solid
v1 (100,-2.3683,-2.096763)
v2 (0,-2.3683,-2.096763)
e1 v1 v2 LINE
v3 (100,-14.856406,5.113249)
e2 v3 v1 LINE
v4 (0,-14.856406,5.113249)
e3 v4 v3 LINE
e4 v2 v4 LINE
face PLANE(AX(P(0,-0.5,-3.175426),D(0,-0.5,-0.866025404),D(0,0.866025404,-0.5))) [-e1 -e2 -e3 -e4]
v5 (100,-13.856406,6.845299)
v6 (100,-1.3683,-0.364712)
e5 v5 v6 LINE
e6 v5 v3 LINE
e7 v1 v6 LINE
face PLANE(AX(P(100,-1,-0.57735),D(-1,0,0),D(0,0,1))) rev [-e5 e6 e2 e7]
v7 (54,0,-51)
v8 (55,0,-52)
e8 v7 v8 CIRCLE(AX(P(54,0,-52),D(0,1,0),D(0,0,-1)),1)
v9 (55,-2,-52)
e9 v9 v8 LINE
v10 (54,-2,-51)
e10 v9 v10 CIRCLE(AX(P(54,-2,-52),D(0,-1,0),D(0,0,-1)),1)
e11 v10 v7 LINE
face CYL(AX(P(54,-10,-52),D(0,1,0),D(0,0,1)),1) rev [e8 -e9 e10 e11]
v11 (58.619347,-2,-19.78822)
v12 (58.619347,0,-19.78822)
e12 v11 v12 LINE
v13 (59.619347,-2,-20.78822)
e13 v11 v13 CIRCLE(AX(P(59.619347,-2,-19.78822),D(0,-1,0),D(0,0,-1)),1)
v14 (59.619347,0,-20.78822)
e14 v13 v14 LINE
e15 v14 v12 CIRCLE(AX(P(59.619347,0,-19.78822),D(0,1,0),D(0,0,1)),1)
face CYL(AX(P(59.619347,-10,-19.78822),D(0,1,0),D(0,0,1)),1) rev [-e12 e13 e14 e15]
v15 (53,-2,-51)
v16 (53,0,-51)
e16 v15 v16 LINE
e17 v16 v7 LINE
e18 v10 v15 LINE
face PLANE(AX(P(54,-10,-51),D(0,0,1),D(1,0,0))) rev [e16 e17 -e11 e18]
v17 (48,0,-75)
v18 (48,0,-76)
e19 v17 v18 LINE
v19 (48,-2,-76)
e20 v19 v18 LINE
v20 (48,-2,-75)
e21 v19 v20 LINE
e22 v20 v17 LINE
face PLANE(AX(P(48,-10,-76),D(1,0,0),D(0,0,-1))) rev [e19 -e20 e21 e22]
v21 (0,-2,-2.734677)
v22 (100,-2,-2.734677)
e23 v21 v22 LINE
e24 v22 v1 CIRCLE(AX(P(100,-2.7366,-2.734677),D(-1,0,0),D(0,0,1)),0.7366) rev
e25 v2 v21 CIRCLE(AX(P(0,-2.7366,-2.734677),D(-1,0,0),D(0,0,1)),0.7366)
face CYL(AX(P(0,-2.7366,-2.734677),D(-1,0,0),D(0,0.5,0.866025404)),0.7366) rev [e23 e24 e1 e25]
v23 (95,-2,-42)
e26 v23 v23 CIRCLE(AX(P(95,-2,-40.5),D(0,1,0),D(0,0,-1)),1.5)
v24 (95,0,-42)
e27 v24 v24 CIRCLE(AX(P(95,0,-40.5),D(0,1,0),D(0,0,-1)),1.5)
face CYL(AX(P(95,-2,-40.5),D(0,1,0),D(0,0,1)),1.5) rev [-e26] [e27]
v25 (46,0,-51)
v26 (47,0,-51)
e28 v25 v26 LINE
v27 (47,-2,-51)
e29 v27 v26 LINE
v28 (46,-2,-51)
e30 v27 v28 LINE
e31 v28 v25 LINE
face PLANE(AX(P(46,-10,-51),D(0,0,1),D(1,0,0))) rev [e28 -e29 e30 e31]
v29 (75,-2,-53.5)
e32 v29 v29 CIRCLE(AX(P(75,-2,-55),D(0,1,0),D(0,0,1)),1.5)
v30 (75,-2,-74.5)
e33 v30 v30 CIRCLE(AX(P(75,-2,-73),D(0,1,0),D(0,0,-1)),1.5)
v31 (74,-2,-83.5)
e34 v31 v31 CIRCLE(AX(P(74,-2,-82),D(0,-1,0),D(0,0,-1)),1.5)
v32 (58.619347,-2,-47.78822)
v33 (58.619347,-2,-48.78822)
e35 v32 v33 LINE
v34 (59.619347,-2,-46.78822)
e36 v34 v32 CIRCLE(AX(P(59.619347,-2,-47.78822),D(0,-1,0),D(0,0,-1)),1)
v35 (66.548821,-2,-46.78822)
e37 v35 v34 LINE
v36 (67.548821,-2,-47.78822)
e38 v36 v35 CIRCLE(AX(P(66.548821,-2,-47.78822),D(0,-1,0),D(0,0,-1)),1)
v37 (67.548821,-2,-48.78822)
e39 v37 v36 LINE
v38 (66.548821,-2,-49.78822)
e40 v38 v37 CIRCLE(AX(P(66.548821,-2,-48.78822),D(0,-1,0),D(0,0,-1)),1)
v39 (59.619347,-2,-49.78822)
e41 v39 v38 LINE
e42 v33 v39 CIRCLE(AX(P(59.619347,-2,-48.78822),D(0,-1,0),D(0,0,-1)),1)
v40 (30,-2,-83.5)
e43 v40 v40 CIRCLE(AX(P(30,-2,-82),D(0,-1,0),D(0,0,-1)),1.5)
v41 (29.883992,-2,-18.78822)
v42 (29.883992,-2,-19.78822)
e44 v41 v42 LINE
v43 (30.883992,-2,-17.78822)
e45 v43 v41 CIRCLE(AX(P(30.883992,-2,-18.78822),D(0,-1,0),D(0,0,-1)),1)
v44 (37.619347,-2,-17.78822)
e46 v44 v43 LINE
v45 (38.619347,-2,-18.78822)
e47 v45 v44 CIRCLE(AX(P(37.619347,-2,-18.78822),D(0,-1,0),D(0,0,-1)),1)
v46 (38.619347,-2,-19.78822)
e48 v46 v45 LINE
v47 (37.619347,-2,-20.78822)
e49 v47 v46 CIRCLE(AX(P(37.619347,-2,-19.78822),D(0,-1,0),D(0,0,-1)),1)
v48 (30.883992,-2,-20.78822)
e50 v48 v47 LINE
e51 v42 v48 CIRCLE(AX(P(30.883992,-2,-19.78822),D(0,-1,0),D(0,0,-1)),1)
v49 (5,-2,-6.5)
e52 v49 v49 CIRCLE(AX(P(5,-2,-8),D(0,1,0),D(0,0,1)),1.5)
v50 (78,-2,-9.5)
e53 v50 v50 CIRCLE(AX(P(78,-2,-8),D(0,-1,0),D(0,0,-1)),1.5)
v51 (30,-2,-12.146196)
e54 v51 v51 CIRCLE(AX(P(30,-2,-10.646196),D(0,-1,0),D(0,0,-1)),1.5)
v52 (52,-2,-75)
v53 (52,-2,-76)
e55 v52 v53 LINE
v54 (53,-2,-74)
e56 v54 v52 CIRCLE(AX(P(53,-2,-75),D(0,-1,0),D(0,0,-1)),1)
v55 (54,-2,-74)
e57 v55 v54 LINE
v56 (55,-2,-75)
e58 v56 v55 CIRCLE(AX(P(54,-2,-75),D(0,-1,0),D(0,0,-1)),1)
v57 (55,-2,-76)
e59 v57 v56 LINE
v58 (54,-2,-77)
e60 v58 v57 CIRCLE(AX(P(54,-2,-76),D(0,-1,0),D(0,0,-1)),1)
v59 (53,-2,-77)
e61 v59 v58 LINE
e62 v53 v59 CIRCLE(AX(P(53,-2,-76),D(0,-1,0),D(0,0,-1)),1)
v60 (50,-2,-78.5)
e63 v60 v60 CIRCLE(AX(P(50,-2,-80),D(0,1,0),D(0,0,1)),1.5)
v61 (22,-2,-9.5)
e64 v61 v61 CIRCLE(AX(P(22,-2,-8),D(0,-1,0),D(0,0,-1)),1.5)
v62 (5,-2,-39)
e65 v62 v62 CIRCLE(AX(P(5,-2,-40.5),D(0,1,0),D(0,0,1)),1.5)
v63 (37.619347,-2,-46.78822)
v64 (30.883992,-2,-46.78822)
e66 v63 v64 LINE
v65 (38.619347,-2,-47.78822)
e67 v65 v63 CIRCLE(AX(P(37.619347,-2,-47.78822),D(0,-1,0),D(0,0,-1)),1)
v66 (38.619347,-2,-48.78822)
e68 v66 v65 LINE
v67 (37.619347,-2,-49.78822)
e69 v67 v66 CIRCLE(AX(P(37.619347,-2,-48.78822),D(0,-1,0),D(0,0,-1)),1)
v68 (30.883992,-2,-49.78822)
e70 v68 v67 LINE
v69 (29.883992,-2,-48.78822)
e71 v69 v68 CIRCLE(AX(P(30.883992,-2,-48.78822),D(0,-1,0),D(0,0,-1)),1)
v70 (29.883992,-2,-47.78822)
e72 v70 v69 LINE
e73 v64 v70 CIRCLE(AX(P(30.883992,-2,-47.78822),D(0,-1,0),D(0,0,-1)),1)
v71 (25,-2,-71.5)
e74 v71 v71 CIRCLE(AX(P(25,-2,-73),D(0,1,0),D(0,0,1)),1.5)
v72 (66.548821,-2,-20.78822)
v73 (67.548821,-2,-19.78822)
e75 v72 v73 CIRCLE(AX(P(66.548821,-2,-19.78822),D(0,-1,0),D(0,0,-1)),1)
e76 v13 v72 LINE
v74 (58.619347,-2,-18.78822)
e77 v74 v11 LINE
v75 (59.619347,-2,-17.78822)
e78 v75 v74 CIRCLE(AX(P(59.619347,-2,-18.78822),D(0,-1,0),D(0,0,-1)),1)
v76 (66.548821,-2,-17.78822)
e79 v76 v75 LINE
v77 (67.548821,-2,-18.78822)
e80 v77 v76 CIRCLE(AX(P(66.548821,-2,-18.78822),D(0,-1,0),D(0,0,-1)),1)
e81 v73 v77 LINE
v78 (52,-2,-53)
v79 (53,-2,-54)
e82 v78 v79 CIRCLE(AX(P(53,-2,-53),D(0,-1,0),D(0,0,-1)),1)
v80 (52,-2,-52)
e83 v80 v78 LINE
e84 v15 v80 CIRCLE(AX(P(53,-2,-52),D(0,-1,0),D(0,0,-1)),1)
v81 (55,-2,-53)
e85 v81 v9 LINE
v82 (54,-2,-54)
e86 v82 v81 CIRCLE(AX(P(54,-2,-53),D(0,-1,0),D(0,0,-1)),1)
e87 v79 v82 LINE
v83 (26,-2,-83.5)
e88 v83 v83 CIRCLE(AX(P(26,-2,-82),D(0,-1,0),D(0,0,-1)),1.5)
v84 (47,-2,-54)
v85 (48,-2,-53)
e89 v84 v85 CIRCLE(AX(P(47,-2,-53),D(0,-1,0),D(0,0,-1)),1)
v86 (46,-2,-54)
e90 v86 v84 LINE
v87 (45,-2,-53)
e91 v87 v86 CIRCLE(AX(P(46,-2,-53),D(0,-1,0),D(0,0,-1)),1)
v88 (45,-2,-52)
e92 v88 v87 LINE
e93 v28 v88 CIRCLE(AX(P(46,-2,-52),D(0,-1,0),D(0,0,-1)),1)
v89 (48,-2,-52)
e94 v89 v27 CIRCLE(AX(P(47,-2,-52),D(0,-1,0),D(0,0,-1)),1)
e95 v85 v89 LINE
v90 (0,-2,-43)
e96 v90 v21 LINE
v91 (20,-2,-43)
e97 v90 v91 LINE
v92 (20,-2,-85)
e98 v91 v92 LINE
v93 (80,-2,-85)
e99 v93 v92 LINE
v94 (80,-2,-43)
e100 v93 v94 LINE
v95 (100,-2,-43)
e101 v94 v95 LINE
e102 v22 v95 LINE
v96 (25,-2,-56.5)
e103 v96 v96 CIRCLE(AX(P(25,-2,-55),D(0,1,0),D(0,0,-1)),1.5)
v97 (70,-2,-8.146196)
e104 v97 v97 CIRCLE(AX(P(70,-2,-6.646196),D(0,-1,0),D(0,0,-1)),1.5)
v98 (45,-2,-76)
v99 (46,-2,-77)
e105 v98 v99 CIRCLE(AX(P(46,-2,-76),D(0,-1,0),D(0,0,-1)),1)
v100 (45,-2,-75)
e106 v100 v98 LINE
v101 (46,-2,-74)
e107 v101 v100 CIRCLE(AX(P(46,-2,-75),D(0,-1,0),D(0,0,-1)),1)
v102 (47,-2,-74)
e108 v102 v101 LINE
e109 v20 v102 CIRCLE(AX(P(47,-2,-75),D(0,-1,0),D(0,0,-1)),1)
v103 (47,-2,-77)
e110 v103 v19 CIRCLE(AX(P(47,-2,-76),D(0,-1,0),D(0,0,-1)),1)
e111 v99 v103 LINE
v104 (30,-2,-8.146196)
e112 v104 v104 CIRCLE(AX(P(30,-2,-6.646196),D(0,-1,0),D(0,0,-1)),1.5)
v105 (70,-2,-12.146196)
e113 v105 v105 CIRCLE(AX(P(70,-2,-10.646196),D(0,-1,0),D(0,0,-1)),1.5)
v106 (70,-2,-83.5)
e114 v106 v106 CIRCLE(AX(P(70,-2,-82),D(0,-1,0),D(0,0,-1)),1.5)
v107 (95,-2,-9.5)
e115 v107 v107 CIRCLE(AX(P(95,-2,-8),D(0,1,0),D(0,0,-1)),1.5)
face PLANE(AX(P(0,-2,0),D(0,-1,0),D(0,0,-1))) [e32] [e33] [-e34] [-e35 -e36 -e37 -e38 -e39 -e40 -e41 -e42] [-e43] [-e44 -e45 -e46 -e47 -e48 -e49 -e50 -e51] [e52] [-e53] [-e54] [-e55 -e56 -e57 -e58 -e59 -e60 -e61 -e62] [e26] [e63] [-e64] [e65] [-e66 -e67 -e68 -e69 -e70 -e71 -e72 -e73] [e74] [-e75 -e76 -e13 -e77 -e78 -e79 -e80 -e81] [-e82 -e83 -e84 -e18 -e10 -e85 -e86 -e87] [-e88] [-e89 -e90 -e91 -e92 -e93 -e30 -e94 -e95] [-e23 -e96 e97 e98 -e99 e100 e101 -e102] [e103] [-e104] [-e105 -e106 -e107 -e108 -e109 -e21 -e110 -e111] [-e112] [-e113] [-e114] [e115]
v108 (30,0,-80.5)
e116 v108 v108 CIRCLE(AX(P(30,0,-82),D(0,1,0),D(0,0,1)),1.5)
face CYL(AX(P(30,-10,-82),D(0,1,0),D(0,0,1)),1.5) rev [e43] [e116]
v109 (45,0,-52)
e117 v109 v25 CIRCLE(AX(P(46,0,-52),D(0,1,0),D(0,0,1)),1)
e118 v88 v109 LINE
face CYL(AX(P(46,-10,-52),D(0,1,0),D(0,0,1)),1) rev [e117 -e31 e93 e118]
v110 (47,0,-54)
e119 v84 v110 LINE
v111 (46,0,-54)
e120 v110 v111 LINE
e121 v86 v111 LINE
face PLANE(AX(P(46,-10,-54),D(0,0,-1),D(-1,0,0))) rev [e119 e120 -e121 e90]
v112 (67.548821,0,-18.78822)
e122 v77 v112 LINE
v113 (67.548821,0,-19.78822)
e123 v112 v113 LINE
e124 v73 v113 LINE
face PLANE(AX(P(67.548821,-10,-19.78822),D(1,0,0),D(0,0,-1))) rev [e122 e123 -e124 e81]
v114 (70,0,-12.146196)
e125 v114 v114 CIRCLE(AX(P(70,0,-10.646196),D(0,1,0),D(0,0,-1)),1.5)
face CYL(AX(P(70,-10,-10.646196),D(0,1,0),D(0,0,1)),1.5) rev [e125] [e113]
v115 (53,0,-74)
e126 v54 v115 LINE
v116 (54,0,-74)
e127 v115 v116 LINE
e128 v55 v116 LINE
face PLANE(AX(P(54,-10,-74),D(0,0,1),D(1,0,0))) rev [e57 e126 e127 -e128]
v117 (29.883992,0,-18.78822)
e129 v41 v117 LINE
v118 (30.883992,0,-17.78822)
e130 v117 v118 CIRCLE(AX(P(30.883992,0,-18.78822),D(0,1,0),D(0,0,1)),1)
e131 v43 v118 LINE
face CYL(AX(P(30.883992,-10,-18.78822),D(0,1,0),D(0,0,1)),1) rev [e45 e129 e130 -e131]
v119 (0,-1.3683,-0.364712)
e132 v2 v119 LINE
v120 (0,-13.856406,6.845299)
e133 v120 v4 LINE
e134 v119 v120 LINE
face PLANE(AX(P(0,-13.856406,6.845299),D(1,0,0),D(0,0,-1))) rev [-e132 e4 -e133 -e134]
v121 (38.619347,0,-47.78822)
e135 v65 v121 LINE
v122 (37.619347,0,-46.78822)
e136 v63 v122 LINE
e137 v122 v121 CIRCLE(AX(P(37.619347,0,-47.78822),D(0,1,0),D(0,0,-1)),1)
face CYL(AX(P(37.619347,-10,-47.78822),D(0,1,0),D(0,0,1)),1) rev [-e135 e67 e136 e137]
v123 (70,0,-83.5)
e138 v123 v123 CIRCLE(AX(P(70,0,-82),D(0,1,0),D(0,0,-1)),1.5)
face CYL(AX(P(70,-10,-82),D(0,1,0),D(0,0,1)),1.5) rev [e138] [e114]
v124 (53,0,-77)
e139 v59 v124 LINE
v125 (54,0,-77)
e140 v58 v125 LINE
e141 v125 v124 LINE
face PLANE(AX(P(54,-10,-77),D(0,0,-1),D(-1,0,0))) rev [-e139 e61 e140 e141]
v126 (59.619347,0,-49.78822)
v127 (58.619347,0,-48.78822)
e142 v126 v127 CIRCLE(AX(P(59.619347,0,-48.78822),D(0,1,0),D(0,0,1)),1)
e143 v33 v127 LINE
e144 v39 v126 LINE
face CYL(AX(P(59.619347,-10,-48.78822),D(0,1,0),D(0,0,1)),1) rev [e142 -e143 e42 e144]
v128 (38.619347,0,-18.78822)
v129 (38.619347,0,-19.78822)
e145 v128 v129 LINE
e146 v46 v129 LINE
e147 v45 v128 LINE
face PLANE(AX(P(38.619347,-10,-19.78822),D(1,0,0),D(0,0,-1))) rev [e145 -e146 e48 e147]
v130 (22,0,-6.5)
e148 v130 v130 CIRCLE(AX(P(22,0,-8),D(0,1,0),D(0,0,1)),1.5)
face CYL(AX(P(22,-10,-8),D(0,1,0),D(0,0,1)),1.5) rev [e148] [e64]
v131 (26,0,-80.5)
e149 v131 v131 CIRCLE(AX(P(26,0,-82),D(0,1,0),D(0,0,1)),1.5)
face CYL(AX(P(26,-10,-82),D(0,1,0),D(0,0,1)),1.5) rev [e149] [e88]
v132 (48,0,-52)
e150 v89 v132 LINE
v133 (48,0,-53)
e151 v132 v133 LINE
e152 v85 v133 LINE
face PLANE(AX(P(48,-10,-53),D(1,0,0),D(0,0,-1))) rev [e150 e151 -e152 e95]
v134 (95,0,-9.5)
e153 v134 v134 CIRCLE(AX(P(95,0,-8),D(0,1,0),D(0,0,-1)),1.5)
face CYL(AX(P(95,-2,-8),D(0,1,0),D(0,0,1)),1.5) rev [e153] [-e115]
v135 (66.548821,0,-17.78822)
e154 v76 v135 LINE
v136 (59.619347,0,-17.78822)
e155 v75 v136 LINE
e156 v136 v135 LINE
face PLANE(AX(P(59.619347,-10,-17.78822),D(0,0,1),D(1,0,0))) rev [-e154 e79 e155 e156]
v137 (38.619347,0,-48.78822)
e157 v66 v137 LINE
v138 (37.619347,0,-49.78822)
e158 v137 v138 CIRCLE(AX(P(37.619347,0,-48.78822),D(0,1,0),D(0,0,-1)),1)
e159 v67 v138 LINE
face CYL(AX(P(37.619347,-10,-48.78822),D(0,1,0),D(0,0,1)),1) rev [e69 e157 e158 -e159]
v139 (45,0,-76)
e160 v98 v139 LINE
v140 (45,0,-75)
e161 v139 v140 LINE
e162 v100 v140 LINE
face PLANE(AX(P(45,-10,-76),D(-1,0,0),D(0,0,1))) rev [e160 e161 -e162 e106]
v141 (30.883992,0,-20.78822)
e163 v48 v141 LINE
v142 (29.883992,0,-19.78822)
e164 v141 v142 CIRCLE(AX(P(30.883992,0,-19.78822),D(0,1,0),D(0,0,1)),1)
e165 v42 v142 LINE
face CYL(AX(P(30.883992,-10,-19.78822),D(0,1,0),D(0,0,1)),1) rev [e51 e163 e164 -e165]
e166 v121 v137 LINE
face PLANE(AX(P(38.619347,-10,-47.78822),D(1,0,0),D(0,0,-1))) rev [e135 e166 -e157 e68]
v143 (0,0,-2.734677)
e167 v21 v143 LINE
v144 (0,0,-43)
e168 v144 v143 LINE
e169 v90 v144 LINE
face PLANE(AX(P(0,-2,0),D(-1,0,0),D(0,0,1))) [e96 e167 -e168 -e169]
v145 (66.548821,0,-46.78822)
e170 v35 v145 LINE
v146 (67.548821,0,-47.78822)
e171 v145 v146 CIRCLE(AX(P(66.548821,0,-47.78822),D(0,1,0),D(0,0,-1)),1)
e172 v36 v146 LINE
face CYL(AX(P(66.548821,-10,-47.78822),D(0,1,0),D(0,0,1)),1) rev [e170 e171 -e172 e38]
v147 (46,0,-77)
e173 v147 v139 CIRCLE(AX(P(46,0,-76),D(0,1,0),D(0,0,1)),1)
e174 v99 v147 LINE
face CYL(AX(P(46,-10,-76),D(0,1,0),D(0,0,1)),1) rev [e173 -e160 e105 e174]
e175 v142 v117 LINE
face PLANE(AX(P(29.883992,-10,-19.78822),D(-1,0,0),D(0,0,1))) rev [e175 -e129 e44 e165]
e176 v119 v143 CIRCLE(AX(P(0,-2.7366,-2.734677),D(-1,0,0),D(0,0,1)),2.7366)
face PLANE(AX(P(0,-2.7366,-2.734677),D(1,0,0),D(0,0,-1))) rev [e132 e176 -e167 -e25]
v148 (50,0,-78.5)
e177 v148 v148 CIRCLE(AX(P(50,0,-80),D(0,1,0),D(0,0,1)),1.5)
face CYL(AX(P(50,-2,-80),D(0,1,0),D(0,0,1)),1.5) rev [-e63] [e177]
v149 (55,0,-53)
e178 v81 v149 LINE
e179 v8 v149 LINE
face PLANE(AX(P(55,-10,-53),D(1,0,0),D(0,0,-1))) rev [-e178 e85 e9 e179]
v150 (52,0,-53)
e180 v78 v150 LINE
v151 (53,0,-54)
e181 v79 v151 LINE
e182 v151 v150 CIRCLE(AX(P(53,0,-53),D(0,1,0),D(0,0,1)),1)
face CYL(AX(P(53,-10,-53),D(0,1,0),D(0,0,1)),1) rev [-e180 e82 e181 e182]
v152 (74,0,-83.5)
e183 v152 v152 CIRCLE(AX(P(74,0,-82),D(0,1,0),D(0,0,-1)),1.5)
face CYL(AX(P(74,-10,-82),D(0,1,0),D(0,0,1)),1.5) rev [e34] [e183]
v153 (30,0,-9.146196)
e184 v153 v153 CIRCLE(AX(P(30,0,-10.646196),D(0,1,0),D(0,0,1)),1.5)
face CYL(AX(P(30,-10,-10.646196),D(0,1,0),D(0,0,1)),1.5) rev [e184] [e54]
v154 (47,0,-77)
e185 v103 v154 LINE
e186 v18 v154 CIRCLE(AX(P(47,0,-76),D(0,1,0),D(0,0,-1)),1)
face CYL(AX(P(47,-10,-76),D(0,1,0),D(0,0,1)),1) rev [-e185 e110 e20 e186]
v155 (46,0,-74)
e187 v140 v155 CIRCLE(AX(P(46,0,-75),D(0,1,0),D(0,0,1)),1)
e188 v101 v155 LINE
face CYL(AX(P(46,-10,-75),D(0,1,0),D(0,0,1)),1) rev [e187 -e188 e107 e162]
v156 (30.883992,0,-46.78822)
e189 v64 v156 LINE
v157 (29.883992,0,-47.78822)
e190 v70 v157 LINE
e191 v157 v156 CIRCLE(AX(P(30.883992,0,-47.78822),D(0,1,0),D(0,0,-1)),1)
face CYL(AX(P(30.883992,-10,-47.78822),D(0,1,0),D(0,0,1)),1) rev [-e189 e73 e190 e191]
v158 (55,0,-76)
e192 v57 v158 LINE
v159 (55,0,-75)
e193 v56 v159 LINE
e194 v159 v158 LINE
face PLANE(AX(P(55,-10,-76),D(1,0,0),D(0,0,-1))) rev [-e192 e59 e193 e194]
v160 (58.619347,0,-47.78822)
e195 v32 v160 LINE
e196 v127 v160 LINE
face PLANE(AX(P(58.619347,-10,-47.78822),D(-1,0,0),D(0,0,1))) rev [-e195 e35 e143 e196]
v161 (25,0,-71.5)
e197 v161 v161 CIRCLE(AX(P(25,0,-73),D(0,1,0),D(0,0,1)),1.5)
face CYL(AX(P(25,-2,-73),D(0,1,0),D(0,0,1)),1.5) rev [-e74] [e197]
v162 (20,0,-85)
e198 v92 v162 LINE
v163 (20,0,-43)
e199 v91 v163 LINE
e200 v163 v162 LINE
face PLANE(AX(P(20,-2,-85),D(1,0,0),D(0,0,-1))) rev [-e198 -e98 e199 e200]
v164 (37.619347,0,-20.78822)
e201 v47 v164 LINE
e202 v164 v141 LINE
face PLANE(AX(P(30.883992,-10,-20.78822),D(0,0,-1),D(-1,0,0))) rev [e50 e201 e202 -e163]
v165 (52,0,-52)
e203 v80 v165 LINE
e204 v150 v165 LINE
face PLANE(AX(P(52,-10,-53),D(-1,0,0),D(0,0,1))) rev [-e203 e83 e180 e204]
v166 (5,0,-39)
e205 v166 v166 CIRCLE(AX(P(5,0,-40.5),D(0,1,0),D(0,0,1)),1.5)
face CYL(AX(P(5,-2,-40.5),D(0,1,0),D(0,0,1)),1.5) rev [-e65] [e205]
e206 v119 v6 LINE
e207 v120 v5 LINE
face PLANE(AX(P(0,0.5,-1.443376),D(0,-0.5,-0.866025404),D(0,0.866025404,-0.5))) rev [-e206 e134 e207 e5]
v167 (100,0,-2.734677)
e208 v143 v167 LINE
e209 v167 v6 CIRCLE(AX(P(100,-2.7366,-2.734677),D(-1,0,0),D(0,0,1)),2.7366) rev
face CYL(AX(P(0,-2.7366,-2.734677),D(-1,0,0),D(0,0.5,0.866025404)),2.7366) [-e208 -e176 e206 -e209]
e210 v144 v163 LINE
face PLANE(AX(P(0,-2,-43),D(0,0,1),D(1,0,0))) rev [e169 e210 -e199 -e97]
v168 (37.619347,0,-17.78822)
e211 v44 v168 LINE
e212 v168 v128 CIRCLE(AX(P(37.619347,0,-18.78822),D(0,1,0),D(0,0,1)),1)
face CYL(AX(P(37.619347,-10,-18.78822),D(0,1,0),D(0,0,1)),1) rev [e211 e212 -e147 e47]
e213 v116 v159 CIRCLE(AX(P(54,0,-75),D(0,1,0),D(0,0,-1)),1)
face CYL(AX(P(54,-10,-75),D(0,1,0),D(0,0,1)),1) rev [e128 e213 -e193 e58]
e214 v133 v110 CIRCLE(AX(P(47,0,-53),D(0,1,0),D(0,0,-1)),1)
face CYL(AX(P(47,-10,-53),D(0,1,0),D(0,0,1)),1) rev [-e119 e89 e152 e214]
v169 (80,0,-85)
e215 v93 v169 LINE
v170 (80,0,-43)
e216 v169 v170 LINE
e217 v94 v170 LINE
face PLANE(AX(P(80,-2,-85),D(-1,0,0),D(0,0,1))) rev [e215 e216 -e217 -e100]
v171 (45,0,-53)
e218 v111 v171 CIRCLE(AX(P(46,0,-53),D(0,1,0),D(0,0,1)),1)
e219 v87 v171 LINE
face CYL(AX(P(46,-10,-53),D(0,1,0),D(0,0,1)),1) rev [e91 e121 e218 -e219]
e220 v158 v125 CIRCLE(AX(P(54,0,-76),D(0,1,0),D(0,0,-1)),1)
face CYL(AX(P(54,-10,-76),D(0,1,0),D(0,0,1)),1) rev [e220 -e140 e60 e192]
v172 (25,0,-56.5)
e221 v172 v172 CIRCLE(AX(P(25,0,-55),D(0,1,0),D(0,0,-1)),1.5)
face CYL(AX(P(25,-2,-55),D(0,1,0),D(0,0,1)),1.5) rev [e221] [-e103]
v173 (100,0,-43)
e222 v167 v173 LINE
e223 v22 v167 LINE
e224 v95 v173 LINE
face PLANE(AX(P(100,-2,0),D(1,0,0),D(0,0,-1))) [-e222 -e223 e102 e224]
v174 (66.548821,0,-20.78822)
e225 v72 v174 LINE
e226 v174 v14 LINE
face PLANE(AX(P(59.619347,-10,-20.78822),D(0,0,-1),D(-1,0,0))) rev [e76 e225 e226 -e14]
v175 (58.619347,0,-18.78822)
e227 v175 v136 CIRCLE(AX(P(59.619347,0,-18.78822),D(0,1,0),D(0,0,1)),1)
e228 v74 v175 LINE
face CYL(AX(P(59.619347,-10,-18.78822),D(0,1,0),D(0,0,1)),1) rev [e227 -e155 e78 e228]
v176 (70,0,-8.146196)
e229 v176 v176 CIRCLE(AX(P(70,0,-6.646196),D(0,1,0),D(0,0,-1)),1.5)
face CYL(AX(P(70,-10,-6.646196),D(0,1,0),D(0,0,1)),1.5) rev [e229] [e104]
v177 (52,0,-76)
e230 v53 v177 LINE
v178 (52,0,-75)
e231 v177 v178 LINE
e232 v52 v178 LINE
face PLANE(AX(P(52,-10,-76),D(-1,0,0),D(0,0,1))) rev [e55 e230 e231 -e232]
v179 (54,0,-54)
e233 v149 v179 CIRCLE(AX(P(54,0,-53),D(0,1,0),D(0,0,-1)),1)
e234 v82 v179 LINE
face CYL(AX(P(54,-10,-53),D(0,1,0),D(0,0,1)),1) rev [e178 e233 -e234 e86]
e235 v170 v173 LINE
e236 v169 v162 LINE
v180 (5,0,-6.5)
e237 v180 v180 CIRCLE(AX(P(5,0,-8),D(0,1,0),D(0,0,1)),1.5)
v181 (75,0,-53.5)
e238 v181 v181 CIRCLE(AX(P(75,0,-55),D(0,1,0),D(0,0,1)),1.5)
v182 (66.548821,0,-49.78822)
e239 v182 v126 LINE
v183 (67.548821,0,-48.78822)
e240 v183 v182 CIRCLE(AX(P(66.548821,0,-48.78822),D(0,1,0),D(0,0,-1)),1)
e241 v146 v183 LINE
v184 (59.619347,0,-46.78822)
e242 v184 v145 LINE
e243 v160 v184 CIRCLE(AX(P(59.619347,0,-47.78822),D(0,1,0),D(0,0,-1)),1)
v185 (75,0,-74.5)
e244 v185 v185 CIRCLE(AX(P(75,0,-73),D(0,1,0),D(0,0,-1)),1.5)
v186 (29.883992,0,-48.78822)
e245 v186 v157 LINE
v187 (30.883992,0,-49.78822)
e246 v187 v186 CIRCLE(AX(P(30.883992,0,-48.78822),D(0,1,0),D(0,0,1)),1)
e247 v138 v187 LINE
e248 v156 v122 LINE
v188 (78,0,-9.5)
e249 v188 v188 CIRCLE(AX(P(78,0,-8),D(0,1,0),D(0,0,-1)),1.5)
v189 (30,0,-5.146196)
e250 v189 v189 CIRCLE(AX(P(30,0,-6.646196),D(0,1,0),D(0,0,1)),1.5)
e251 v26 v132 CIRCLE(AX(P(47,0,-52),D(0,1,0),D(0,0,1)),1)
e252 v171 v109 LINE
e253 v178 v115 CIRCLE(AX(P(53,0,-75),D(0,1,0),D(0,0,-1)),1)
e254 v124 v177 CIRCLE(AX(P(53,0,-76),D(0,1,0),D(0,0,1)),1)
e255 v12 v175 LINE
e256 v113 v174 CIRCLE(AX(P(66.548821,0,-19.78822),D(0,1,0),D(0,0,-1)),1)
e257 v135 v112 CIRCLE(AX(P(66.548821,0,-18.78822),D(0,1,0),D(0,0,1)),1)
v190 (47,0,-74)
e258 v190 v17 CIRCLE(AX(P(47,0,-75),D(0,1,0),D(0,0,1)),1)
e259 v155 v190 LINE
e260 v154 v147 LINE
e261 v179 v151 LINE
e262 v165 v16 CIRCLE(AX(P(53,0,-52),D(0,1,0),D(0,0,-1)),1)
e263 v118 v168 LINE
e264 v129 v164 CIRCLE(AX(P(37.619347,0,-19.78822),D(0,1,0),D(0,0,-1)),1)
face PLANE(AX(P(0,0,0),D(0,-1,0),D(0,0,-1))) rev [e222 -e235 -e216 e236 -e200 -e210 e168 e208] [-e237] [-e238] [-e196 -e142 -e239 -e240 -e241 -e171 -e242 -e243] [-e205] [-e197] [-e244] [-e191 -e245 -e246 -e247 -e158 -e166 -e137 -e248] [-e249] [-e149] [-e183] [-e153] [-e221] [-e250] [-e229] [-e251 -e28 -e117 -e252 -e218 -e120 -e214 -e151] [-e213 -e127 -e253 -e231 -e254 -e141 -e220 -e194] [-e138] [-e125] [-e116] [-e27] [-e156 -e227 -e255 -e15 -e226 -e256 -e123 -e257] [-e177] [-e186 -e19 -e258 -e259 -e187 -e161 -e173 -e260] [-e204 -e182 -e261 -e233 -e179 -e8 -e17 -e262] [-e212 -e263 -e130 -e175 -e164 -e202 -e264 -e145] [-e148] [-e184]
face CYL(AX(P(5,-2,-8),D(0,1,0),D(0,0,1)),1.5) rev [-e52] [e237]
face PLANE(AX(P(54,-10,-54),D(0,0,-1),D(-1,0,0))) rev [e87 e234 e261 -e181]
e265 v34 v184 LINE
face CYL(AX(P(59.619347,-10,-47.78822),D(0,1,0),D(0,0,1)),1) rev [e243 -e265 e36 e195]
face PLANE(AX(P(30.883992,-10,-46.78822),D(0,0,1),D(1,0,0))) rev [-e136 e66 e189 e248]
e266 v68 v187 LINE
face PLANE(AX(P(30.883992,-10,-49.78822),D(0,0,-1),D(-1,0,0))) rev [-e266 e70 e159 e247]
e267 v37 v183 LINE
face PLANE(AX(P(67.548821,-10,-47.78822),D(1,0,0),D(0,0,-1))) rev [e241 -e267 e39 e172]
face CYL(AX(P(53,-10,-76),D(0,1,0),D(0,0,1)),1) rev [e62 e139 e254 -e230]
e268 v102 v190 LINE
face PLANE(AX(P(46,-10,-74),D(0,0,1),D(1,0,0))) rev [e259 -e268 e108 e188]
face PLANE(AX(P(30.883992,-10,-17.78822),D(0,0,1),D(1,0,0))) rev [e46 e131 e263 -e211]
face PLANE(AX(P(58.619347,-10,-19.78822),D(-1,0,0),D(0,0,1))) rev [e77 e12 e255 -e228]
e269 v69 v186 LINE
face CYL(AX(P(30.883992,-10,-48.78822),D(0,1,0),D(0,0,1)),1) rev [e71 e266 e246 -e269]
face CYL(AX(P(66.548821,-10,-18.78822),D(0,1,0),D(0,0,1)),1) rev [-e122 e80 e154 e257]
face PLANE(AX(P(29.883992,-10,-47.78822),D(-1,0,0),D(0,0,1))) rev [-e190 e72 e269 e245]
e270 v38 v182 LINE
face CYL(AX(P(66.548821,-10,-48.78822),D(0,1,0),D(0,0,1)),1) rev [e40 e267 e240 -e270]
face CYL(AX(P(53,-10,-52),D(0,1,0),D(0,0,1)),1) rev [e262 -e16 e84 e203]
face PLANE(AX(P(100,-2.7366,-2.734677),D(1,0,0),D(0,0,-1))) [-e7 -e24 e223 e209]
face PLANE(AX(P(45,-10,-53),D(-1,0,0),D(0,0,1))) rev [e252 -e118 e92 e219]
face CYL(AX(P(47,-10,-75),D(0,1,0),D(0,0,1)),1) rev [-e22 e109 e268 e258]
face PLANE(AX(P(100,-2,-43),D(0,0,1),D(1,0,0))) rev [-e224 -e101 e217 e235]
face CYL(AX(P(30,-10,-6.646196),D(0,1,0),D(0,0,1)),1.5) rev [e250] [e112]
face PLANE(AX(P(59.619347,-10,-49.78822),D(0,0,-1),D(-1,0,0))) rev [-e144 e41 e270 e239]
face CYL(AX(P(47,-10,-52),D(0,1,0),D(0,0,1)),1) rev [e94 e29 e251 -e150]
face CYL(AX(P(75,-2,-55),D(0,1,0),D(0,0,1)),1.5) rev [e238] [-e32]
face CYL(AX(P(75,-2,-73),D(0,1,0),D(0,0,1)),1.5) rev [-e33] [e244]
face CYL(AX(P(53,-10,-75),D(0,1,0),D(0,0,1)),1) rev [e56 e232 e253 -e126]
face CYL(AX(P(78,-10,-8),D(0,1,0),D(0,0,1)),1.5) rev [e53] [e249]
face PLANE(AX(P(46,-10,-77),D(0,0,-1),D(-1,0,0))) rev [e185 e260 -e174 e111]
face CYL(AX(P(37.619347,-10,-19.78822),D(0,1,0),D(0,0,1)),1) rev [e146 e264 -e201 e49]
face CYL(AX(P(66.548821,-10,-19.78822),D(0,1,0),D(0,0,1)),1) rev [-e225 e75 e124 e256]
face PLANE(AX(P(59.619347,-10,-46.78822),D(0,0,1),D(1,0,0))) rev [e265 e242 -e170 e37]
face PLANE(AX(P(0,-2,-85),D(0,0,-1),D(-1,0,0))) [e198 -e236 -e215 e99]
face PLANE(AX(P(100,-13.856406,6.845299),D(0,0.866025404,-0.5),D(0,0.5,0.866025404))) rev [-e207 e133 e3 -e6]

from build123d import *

# Parameters (mm, degrees)
SKETCH1_W            = 100
SKETCH1_H            = 85
BASE_FLANGE1_DEPTH   = 2
EDGE_FLANGE2_DEPTH   = 100
EDGE_FLANGE2_2_DEPTH = 100
SKETCH16_R           = 1.5
SKETCH16_W           = 20
SKETCH16_H           = 42
CUT_EXTRUDE2_DEPTH   = 2
SKETCH18_R           = 1.5
CUT_EXTRUDE3_DEPTH   = 10
SKETCH19_R           = 1.5
CUT_EXTRUDE5_DEPTH   = 10
CUT_EXTRUDE6_DEPTH   = 10
SKETCH21_R           = 1.5
CUT_EXTRUDE7_DEPTH   = 10


# Read off the part's stored shape, not the designer's step: Edge-Flange2
# Sheet-metal steps are written as plain solids
with BuildPart() as part:
    # Sketch1 → Base-Flange1 (new body)
    with BuildSketch(Plane(origin=(0, 0, 0), x_dir=(1, 0, 0), z_dir=(0, 1, 0))):
        with Locations((50, 42.5)):
            Rectangle(SKETCH1_W, SKETCH1_H)
    extrude(amount=-BASE_FLANGE1_DEPTH)

    # Edge-Flange2 outline → Edge-Flange2 (cut)
    with BuildSketch(Plane.YZ):
        with BuildLine():
            Line((-2, 0), (-1.3683, -0.364712165))
            ThreePointArc((-1.3683, -0.364712165), (-0.36663488, -1.366377285), (0, -2.734677285))
            Line((0, -2.734677285), (0, 0))
            Line((0, 0), (-2, 0))
        make_face()
    extrude(amount=EDGE_FLANGE2_DEPTH, mode=Mode.SUBTRACT)

    # Edge-Flange2 2 outline → Edge-Flange2 2 (add)
    with BuildSketch(Plane.YZ):
        with BuildLine():
            Line((-2, -2.734677285), (-2, 0))
            Line((-2, 0), (-13.856406461, 6.845299462))
            Line((-13.856406461, 6.845299462), (-14.856406461, 5.113248654))
            Line((-14.856406461, 5.113248654), (-2.3683, -2.096762973))
            ThreePointArc((-2.3683, -2.096762973), (-2.098685688, -2.366377285), (-2, -2.734677285))
        make_face()
    extrude(amount=EDGE_FLANGE2_2_DEPTH)

    # Sketch16 → Cut-Extrude2 (cut)
    with BuildSketch(Plane(origin=(0, 0, 0), x_dir=(1, 0, 0), z_dir=(0, 1, 0))):
        with Locations(Location((5, 8, 0), (0, 0, 270))):
            Circle(SKETCH16_R)
        with Locations(Location((50, 80, 0), (0, 0, 270))):
            Circle(SKETCH16_R)
        with Locations(Location((5, 40.5, 0), (0, 0, 270))):
            Circle(SKETCH16_R)
        with Locations(Location((95, 8, 0), (0, 0, 90))):
            Circle(SKETCH16_R)
        with Locations(Location((95, 40.5, 0), (0, 0, 90))):
            Circle(SKETCH16_R)
        with Locations(Location((25, 73, 0), (0, 0, 270))):
            Circle(SKETCH16_R)
        with Locations(Location((25, 55, 0), (0, 0, 90))):
            Circle(SKETCH16_R)
        with Locations(Location((75, 55, 0), (0, 0, 270))):
            Circle(SKETCH16_R)
        with Locations(Location((75, 73, 0), (0, 0, 90))):
            Circle(SKETCH16_R)
        with Locations((10, 64)):
            Rectangle(SKETCH16_W, SKETCH16_H)
        with Locations((90, 64)):
            Rectangle(SKETCH16_W, SKETCH16_H)
    extrude(amount=-CUT_EXTRUDE2_DEPTH, mode=Mode.SUBTRACT)

    # Sketch18 → Cut-Extrude3 (cut)
    with BuildSketch(Plane(origin=(0, 0, 0), x_dir=(1, 0, 0), z_dir=(0, 1, 0))):
        with Locations(Location((22, 8, 0), (0, 0, 270))):
            Circle(SKETCH18_R)
        with Locations(Location((78, 8, 0), (0, 0, 90))):
            Circle(SKETCH18_R)
    extrude(amount=-CUT_EXTRUDE3_DEPTH, mode=Mode.SUBTRACT)

    # Sketch19 → Cut-Extrude5 (cut)
    with BuildSketch(Plane(origin=(0, 0, 0), x_dir=(1, 0, 0), z_dir=(0, 1, 0))):
        with Locations(Location((30, 6.646195809, 0), (0, 0, 270))):
            Circle(SKETCH19_R)
        with Locations(Location((30, 10.646195809, 0), (0, 0, 270))):
            Circle(SKETCH19_R)
        with Locations(Location((70, 6.646195809, 0), (0, 0, 90))):
            Circle(SKETCH19_R)
        with Locations(Location((70, 10.646195809, 0), (0, 0, 90))):
            Circle(SKETCH19_R)
    extrude(amount=-CUT_EXTRUDE5_DEPTH, mode=Mode.SUBTRACT)

    # Sketch20 → Cut-Extrude6 (cut)
    with BuildSketch(Plane(origin=(0, 0, 0), x_dir=(1, 0, 0), z_dir=(0, 1, 0))):
        with BuildLine():
            Line((59.619346947, 49.788219715), (66.548820549, 49.788219715))
            ThreePointArc((66.548820549, 49.788219715), (67.25592733, 49.495326496), (67.548820549, 48.788219715))
            Line((67.548820549, 48.788219715), (67.548820549, 47.788219715))
            ThreePointArc((67.548820549, 47.788219715), (67.25592733, 47.081112934), (66.548820549, 46.788219715))
            Line((66.548820549, 46.788219715), (59.619346947, 46.788219715))
            ThreePointArc((59.619346947, 46.788219715), (58.912240166, 47.081112934), (58.619346947, 47.788219715))
            Line((58.619346947, 47.788219715), (58.619346947, 48.788219715))
            ThreePointArc((58.619346947, 48.788219715), (58.912240166, 49.495326496), (59.619346947, 49.788219715))
        make_face()
        with BuildLine():
            Line((30.883992336, 20.788219715), (37.619346947, 20.788219715))
            ThreePointArc((37.619346947, 20.788219715), (38.326453728, 20.495326496), (38.619346947, 19.788219715))
            Line((38.619346947, 19.788219715), (38.619346947, 18.788219715))
            ThreePointArc((38.619346947, 18.788219715), (38.326453728, 18.081112934), (37.619346947, 17.788219715))
            Line((37.619346947, 17.788219715), (30.883992336, 17.788219715))
            ThreePointArc((30.883992336, 17.788219715), (30.176885554, 18.081112934), (29.883992336, 18.788219715))
            Line((29.883992336, 18.788219715), (29.883992336, 19.788219715))
            ThreePointArc((29.883992336, 19.788219715), (30.176885554, 20.495326496), (30.883992336, 20.788219715))
        make_face()
        with BuildLine():
            Line((59.619346947, 20.788219715), (66.548820549, 20.788219715))
            ThreePointArc((66.548820549, 20.788219715), (67.25592733, 20.495326496), (67.548820549, 19.788219715))
            Line((67.548820549, 19.788219715), (67.548820549, 18.788219715))
            ThreePointArc((67.548820549, 18.788219715), (67.25592733, 18.081112934), (66.548820549, 17.788219715))
            Line((66.548820549, 17.788219715), (59.619346947, 17.788219715))
            ThreePointArc((59.619346947, 17.788219715), (58.912240166, 18.081112934), (58.619346947, 18.788219715))
            Line((58.619346947, 18.788219715), (58.619346947, 19.788219715))
            ThreePointArc((58.619346947, 19.788219715), (58.912240166, 20.495326496), (59.619346947, 20.788219715))
        make_face()
        with BuildLine():
            Line((30.883992336, 49.788219715), (37.619346947, 49.788219715))
            ThreePointArc((37.619346947, 49.788219715), (38.326453728, 49.495326496), (38.619346947, 48.788219715))
            Line((38.619346947, 48.788219715), (38.619346947, 47.788219715))
            ThreePointArc((38.619346947, 47.788219715), (38.326453728, 47.081112934), (37.619346947, 46.788219715))
            Line((37.619346947, 46.788219715), (30.883992336, 46.788219715))
            ThreePointArc((30.883992336, 46.788219715), (30.176885554, 47.081112934), (29.883992336, 47.788219715))
            Line((29.883992336, 47.788219715), (29.883992336, 48.788219715))
            ThreePointArc((29.883992336, 48.788219715), (30.176885554, 49.495326496), (30.883992336, 49.788219715))
        make_face()
    extrude(amount=-CUT_EXTRUDE6_DEPTH, mode=Mode.SUBTRACT)

    # Sketch21 → Cut-Extrude7 (cut)
    with BuildSketch(Plane(origin=(0, 0, 0), x_dir=(1, 0, 0), z_dir=(0, 1, 0))):
        with Locations(Location((26, 82, 0), (0, 0, 270))):
            Circle(SKETCH21_R)
        with Locations(Location((30, 82, 0), (0, 0, 270))):
            Circle(SKETCH21_R)
        with Locations(Location((74, 82, 0), (0, 0, 90))):
            Circle(SKETCH21_R)
        with Locations(Location((70, 82, 0), (0, 0, 90))):
            Circle(SKETCH21_R)
        with BuildLine():
            Line((54, 51), (53, 51))
            ThreePointArc((53, 51), (52.292893219, 51.292893219), (52, 52))
            Line((52, 52), (52, 53))
            ThreePointArc((52, 53), (52.292893219, 53.707106781), (53, 54))
            Line((53, 54), (54, 54))
            ThreePointArc((54, 54), (54.707106781, 53.707106781), (55, 53))
            Line((55, 53), (55, 52))
            ThreePointArc((55, 52), (54.707106781, 51.292893219), (54, 51))
        make_face()
        with BuildLine():
            Line((46, 77), (47, 77))
            ThreePointArc((47, 77), (47.707106781, 76.707106781), (48, 76))
            Line((48, 76), (48, 75))
            ThreePointArc((48, 75), (47.707106781, 74.292893219), (47, 74))
            Line((47, 74), (46, 74))
            ThreePointArc((46, 74), (45.292893219, 74.292893219), (45, 75))
            Line((45, 75), (45, 76))
            ThreePointArc((45, 76), (45.292893219, 76.707106781), (46, 77))
        make_face()
        with BuildLine():
            Line((46, 54), (47, 54))
            ThreePointArc((47, 54), (47.707106781, 53.707106781), (48, 53))
            Line((48, 53), (48, 52))
            ThreePointArc((48, 52), (47.707106781, 51.292893219), (47, 51))
            Line((47, 51), (46, 51))
            ThreePointArc((46, 51), (45.292893219, 51.292893219), (45, 52))
            Line((45, 52), (45, 53))
            ThreePointArc((45, 53), (45.292893219, 53.707106781), (46, 54))
        make_face()
        with BuildLine():
            Line((54, 74), (53, 74))
            ThreePointArc((53, 74), (52.292893219, 74.292893219), (52, 75))
            Line((52, 75), (52, 76))
            ThreePointArc((52, 76), (52.292893219, 76.707106781), (53, 77))
            Line((53, 77), (54, 77))
            ThreePointArc((54, 77), (54.707106781, 76.707106781), (55, 76))
            Line((55, 76), (55, 75))
            ThreePointArc((55, 75), (54.707106781, 74.292893219), (54, 74))
        make_face()
    extrude(amount=-CUT_EXTRUDE7_DEPTH, mode=Mode.SUBTRACT)


solid = part.part
